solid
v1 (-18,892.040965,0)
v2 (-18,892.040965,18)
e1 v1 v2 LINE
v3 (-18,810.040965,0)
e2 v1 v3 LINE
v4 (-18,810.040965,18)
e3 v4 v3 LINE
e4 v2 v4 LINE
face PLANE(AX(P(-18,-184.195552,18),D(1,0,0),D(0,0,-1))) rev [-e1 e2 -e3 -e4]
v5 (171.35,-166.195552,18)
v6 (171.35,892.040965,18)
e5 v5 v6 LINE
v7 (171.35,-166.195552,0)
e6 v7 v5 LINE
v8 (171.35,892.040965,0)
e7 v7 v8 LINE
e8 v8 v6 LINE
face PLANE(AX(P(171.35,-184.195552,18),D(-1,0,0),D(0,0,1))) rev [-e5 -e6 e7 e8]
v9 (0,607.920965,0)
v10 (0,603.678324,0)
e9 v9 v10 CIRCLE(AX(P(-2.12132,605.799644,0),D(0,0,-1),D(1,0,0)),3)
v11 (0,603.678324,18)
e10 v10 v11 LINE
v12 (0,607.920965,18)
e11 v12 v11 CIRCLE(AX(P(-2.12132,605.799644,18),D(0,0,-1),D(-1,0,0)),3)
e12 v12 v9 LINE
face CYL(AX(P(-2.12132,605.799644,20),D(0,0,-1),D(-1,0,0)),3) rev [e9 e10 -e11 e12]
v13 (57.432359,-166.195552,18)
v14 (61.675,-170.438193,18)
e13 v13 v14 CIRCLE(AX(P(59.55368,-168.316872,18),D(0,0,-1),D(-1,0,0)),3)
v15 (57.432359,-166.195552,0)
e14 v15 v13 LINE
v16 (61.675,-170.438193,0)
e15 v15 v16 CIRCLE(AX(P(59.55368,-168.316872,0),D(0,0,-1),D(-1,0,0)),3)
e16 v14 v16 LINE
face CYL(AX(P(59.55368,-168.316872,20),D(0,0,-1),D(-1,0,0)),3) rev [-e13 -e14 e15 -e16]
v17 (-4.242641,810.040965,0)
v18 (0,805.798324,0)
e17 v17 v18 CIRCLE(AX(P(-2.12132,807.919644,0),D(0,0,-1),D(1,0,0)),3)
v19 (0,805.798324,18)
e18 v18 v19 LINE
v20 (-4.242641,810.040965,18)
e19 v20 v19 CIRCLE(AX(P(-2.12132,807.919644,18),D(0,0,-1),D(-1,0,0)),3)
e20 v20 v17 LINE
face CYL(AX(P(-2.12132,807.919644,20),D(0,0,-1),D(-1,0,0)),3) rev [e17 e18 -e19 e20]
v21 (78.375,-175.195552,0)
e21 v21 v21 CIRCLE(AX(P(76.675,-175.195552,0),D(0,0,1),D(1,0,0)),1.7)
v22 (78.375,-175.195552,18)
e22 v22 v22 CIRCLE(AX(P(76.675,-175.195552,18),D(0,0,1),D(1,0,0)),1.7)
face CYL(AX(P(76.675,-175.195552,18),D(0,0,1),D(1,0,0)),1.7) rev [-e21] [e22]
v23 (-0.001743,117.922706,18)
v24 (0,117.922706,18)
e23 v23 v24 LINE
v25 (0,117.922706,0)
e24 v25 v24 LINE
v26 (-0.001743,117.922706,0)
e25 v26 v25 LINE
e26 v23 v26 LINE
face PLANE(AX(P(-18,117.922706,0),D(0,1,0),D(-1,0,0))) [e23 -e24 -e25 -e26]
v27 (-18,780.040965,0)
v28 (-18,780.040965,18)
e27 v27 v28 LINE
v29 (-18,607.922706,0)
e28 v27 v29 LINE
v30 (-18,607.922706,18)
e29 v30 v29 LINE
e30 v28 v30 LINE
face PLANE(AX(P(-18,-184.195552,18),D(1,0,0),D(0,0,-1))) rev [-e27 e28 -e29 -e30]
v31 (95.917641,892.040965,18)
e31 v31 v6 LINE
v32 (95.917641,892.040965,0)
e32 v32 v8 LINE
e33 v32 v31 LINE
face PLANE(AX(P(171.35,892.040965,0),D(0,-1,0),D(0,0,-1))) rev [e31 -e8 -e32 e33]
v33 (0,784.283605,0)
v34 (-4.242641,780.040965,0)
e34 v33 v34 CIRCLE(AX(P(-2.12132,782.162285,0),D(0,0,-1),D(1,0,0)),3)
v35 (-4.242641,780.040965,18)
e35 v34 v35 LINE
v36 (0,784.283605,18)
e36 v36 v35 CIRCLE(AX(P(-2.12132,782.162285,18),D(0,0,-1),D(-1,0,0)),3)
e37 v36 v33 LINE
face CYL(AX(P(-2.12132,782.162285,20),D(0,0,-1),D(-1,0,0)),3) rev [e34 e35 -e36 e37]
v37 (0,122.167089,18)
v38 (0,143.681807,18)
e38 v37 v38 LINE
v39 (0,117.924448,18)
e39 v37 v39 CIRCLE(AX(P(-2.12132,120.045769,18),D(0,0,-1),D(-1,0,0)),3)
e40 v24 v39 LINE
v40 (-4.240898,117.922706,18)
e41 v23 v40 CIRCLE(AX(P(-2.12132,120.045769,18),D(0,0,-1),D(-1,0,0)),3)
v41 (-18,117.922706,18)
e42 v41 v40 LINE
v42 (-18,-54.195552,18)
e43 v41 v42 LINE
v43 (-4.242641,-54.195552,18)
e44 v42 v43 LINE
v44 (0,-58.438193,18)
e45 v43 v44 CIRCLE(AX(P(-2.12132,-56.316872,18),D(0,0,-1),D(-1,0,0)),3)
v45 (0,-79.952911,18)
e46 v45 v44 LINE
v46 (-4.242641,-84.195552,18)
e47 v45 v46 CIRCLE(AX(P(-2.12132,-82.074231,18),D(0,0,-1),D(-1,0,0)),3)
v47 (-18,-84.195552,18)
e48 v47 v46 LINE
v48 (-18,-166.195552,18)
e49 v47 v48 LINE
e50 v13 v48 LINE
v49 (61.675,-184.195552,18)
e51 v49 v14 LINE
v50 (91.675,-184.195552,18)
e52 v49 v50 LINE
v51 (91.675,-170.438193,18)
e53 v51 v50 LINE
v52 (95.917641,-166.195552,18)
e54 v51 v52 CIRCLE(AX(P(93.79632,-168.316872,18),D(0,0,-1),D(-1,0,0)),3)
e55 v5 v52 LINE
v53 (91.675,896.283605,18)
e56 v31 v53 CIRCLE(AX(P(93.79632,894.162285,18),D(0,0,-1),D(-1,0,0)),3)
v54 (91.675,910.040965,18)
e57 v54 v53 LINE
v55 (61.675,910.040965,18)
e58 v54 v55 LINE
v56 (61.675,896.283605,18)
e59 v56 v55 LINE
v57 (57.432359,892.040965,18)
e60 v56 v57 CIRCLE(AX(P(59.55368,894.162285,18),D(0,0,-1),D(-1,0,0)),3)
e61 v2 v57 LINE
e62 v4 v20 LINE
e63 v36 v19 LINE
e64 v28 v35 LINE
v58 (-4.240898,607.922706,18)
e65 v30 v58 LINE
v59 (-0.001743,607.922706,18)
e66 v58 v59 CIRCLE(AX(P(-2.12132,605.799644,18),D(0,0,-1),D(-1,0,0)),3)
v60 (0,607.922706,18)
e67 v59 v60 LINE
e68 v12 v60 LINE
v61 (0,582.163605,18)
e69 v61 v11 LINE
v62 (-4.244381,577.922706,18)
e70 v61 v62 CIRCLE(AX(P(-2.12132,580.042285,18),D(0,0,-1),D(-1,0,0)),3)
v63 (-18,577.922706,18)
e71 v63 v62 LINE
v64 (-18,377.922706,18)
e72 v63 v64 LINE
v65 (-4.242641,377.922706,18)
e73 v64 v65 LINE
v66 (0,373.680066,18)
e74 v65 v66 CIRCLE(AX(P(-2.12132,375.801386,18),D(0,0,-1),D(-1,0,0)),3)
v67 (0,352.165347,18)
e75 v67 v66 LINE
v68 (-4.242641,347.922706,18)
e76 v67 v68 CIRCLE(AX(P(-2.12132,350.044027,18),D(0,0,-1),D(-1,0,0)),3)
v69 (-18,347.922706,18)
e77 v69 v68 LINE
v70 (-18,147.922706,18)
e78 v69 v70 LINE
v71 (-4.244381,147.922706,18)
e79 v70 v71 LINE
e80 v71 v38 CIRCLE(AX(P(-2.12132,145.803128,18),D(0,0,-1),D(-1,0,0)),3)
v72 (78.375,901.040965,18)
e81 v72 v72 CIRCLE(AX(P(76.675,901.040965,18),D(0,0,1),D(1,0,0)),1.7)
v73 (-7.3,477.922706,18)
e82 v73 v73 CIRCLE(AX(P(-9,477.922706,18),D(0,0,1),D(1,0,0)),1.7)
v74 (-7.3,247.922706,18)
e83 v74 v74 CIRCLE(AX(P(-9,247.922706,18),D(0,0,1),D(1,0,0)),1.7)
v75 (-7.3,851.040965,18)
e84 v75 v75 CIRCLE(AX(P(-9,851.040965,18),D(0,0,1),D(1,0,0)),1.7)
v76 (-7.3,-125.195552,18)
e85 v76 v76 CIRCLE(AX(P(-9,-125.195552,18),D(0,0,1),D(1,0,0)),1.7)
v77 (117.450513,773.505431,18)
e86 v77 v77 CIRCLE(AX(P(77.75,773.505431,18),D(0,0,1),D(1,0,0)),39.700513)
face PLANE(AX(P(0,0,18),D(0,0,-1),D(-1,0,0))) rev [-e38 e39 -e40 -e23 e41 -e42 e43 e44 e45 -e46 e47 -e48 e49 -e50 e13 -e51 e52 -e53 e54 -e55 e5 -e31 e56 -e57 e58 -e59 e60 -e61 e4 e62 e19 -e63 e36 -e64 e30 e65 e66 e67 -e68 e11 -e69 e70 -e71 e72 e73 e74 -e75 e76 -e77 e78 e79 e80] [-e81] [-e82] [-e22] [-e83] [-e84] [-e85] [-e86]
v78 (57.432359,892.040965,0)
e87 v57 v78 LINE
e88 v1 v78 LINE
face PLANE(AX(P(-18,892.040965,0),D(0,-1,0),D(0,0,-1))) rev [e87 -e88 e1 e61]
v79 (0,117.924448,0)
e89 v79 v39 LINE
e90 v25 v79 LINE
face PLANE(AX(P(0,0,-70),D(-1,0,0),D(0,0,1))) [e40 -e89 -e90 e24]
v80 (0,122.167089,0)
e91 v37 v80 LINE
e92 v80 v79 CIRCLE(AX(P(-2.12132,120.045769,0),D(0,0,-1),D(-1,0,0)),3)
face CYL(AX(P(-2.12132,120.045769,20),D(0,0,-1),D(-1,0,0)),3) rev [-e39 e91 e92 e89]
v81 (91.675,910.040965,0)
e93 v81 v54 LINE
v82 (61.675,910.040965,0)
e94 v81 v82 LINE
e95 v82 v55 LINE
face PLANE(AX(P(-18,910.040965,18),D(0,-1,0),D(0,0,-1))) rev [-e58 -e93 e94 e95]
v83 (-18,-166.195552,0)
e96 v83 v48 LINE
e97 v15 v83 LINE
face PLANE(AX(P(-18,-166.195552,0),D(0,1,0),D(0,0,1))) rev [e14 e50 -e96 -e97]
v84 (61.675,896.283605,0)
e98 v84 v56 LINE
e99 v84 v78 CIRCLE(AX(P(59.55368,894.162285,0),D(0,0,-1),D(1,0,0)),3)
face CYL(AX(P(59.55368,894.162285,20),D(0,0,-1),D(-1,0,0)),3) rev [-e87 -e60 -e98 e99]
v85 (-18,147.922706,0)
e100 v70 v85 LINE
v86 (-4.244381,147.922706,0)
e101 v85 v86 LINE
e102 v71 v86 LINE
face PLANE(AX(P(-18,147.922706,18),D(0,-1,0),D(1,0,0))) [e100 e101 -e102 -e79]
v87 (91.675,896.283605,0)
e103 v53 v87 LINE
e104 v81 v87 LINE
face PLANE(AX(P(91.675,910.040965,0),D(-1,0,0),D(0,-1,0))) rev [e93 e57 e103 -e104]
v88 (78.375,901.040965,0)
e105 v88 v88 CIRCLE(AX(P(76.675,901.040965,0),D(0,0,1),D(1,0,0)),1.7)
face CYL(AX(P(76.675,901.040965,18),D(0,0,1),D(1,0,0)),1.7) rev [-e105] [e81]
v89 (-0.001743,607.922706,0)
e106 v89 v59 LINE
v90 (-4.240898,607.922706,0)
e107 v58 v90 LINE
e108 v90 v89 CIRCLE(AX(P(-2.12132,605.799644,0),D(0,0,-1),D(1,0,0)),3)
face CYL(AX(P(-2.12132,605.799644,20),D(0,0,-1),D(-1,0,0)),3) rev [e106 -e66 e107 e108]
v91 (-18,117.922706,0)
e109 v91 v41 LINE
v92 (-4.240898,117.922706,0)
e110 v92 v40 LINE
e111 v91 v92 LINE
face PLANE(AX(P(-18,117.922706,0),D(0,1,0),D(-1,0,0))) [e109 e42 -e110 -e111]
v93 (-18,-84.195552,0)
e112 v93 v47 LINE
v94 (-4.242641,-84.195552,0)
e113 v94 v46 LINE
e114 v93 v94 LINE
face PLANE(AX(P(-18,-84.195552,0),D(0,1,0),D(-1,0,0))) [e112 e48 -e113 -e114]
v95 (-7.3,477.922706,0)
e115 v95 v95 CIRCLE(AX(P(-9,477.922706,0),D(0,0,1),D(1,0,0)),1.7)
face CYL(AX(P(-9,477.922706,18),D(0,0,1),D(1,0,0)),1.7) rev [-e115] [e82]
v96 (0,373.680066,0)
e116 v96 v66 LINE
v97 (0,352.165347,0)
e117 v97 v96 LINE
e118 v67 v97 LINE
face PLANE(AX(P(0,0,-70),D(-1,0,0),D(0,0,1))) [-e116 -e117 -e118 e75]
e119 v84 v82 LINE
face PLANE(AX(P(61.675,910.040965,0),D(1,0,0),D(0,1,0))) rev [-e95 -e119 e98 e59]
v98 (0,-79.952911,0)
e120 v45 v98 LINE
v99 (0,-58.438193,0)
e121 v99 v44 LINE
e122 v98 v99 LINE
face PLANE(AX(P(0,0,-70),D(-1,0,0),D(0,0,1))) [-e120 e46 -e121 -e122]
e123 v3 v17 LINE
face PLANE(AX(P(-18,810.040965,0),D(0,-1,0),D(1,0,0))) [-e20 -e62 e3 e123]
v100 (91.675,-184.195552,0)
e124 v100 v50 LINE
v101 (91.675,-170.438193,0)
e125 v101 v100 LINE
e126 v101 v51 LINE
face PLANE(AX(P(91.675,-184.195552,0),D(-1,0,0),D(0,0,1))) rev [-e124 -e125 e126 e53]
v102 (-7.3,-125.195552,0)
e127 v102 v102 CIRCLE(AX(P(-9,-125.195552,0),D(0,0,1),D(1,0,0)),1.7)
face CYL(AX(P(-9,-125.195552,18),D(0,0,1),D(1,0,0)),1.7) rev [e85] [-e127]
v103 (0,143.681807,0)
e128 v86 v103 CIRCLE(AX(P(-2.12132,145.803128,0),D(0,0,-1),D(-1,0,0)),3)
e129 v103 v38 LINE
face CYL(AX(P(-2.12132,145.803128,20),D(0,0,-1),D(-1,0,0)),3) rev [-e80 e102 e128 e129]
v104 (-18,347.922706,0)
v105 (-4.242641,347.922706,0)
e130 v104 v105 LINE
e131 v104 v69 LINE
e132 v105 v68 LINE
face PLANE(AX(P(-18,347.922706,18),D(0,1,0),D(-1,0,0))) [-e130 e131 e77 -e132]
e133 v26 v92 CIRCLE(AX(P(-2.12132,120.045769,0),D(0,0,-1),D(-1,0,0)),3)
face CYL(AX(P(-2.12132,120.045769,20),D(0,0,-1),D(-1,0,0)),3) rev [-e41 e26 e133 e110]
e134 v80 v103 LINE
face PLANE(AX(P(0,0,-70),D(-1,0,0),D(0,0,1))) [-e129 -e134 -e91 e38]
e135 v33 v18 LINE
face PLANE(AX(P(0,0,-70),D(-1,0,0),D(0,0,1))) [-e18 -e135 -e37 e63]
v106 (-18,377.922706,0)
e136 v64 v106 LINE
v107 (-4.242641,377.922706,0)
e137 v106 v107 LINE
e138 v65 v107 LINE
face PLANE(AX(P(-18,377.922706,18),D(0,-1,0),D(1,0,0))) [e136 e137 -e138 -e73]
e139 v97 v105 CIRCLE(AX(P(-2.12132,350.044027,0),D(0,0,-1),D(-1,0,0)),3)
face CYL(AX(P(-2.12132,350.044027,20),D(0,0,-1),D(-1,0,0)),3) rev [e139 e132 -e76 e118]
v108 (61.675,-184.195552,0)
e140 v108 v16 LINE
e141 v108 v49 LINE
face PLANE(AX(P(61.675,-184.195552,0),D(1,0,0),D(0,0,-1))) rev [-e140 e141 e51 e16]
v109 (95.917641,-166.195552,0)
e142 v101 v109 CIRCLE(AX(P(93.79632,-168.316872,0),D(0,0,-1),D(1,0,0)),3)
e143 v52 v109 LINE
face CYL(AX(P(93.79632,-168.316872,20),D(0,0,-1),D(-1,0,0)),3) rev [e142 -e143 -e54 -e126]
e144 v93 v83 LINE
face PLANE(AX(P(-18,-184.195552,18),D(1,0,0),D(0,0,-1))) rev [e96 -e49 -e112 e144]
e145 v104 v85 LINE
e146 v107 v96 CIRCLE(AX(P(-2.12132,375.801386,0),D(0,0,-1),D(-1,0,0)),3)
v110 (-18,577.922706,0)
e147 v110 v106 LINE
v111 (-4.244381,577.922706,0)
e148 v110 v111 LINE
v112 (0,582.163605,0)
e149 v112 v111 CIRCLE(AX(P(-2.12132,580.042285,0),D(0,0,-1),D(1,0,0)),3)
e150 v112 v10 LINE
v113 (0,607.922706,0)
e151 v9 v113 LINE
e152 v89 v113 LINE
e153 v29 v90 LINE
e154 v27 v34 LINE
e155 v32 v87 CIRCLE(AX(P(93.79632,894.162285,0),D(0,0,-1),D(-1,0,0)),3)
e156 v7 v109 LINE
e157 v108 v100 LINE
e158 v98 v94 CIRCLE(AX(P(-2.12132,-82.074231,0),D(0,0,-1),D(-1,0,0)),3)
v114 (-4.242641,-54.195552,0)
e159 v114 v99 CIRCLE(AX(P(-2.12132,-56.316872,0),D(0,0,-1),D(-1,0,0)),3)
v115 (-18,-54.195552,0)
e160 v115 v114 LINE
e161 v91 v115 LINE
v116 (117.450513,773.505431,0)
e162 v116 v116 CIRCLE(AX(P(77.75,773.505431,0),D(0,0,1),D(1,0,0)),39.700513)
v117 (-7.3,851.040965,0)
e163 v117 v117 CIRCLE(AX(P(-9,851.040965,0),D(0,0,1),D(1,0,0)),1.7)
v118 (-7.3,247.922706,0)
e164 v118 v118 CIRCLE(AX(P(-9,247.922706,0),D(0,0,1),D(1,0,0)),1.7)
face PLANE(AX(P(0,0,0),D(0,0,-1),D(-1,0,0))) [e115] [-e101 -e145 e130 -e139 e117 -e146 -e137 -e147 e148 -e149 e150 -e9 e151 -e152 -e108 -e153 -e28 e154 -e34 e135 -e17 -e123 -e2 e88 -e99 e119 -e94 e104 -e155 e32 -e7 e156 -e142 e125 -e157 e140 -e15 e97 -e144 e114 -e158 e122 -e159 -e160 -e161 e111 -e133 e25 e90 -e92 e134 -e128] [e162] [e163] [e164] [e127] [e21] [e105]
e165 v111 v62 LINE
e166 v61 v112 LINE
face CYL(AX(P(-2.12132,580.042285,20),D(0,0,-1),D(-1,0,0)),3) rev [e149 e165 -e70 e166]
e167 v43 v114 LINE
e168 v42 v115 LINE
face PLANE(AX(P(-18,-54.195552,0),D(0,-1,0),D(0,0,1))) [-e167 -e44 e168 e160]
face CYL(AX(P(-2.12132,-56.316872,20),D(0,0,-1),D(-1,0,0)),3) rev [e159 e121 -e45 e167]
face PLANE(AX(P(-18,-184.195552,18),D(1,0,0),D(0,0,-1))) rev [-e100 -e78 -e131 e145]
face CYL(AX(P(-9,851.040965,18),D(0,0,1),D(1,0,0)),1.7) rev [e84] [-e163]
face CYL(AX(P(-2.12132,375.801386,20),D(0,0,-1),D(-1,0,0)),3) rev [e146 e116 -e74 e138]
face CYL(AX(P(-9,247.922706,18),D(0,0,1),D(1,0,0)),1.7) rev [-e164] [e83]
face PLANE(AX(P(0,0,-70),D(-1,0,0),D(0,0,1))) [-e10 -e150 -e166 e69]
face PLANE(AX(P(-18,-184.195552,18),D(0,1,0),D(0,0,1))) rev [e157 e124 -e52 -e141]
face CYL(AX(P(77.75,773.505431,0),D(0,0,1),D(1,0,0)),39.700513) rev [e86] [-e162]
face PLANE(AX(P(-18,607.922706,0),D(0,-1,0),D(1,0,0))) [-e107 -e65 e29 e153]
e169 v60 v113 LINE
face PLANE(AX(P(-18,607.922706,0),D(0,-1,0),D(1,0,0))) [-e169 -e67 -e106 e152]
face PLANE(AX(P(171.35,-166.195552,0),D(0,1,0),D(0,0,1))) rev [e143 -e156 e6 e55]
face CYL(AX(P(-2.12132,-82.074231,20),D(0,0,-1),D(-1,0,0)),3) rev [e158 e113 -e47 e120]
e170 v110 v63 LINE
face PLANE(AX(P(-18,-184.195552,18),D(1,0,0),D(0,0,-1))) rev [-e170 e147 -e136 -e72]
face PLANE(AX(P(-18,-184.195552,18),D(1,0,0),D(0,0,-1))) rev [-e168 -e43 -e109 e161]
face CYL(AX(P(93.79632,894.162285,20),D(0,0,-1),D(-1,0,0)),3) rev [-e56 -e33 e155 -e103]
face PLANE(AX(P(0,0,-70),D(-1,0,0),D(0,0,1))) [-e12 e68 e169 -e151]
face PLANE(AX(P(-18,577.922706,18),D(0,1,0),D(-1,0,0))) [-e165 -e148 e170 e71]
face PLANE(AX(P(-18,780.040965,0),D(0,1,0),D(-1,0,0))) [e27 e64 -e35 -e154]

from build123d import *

# Parameters (mm, degrees)
SKETCH1_W            = 189.35
SKETCH1_H            = 1094.236516537
BOSS_EXTRUDE1_DEPTH  = 18
CAVITY1_START        = -84.195551816
CAVITY1_OUTLINE_W    = 18
CAVITY1_OUTLINE_H    = 18
CAVITY1_DEPTH        = 30
CAVITY1_START_2      = 117.922706453
CAVITY1_2_OUTLINE_W  = 18
CAVITY1_2_OUTLINE_H  = 18
CAVITY1_2_DEPTH      = 30
CAVITY1_START_3      = 347.922706453
CAVITY1_3_OUTLINE_W  = 18
CAVITY1_3_OUTLINE_H  = 18
CAVITY1_3_DEPTH      = 30
CAVITY1_START_4      = 577.922706453
CAVITY1_4_OUTLINE_W  = 18
CAVITY1_4_OUTLINE_H  = 18
CAVITY1_4_DEPTH      = 30
CAVITY1_START_5      = 780.040964722
CAVITY1_5_OUTLINE_W  = 18
CAVITY1_5_OUTLINE_H  = 18
CAVITY1_5_DEPTH      = 30
SKETCH2_W            = 79.675
SKETCH2_H            = 18
CUT_EXTRUDE1_DEPTH   = 18
SKETCH3_R            = 39.700513166
CUT_EXTRUDE2_DEPTH   = 18
M3_CLEARANCE_HOLE1_D = 3.4
SKETCH7_R            = 3
CUT_EXTRUDE3_DEPTH   = 20


# Read off the part's stored shape, not the designer's step: Cavity1
with BuildPart() as part:
    # Sketch1 → Boss-Extrude1 (new body)
    with BuildSketch(Plane.XY):
        with Locations((76.675, 362.922706452)):
            Rectangle(SKETCH1_W, SKETCH1_H)
    extrude(amount=BOSS_EXTRUDE1_DEPTH)

    # Cavity1 outline → Cavity1 (cut)
    with BuildSketch(Plane(origin=(0, 0, 0), x_dir=(1, 0, 0), z_dir=(0, 1, 0)).offset(CAVITY1_START)):
        with Locations((-9, -9)):
            Rectangle(CAVITY1_OUTLINE_W, CAVITY1_OUTLINE_H)
    extrude(amount=CAVITY1_DEPTH, mode=Mode.SUBTRACT)

    # Cavity1 2 outline → Cavity1 2 (cut)
    with BuildSketch(Plane(origin=(0, 0, 0), x_dir=(1, 0, 0), z_dir=(0, 1, 0)).offset(CAVITY1_START_2)):
        with Locations((-9, -9)):
            Rectangle(CAVITY1_2_OUTLINE_W, CAVITY1_2_OUTLINE_H)
    extrude(amount=CAVITY1_2_DEPTH, mode=Mode.SUBTRACT)

    # Cavity1 3 outline → Cavity1 3 (cut)
    with BuildSketch(Plane(origin=(0, 0, 0), x_dir=(1, 0, 0), z_dir=(0, 1, 0)).offset(CAVITY1_START_3)):
        with Locations((-9, -9)):
            Rectangle(CAVITY1_3_OUTLINE_W, CAVITY1_3_OUTLINE_H)
    extrude(amount=CAVITY1_3_DEPTH, mode=Mode.SUBTRACT)

    # Cavity1 4 outline → Cavity1 4 (cut)
    with BuildSketch(Plane(origin=(0, 0, 0), x_dir=(1, 0, 0), z_dir=(0, 1, 0)).offset(CAVITY1_START_4)):
        with Locations((-9, -9)):
            Rectangle(CAVITY1_4_OUTLINE_W, CAVITY1_4_OUTLINE_H)
    extrude(amount=CAVITY1_4_DEPTH, mode=Mode.SUBTRACT)

    # Cavity1 5 outline → Cavity1 5 (cut)
    with BuildSketch(Plane(origin=(0, 0, 0), x_dir=(1, 0, 0), z_dir=(0, 1, 0)).offset(CAVITY1_START_5)):
        with Locations((-9, -9)):
            Rectangle(CAVITY1_5_OUTLINE_W, CAVITY1_5_OUTLINE_H)
    extrude(amount=CAVITY1_5_DEPTH, mode=Mode.SUBTRACT)

    # Sketch2 → Cut-Extrude1 (cut)
    with BuildSketch(Plane.XY.offset(18)):
        with Locations((21.8375, -175.195551816)):
            Rectangle(SKETCH2_W, SKETCH2_H)
        with Locations((131.5125, -175.195551816)):
            Rectangle(SKETCH2_W, SKETCH2_H)
        with Locations((21.8375, 901.040964721)):
            Rectangle(SKETCH2_W, SKETCH2_H)
        with Locations((131.5125, 901.040964721)):
            Rectangle(SKETCH2_W, SKETCH2_H)
    extrude(amount=-CUT_EXTRUDE1_DEPTH, mode=Mode.SUBTRACT)

    # Sketch3 → Cut-Extrude2 (cut)
    with BuildSketch(Plane.XY.offset(18)):
        with Locations((77.75, 773.505430817)):
            Circle(SKETCH3_R)
    extrude(amount=-CUT_EXTRUDE2_DEPTH, mode=Mode.SUBTRACT)

    # M3 Clearance Hole1 (through all)
    with Locations(Plane.XY.offset(18)):
        with Locations((-9, 851.040964721), (-9, -125.195551816), (-9, 477.922706453), (-9, 247.922706453), (76.675, 901.040964721), (76.675, -175.195551816)):
            Hole(M3_CLEARANCE_HOLE1_D / 2)

    # Sketch7 → Cut-Extrude3 (cut)
    with BuildSketch(Plane(origin=(0, 0, 0), x_dir=(-1, 0, 0), z_dir=(0, 0, -1))):
        with Locations((2.121320344, -56.31687216)):
            Circle(SKETCH7_R)
        with Locations((2.121320344, -82.074231473)):
            Circle(SKETCH7_R)
        with Locations((2.121320344, 145.80312784)):
            Circle(SKETCH7_R)
        with Locations((2.121320344, 120.045768527)):
            Circle(SKETCH7_R)
        with Locations((2.121320344, 605.799644378)):
            Circle(SKETCH7_R)
        with Locations((2.121320344, 580.042285065)):
            Circle(SKETCH7_R)
        with Locations((2.121320344, 807.919644378)):
            Circle(SKETCH7_R)
        with Locations((2.121320344, 782.162285065)):
            Circle(SKETCH7_R)
        with Locations((2.121320344, 375.801386109)):
            Circle(SKETCH7_R)
        with Locations((2.121320344, 350.044026796)):
            Circle(SKETCH7_R)
        with Locations((-59.553679656, -168.31687216)):
            Circle(SKETCH7_R)
        with Locations((-93.796320344, -168.31687216)):
            Circle(SKETCH7_R)
        with Locations((-93.796320344, 894.162285065)):
            Circle(SKETCH7_R)
        with Locations((-59.553679656, 894.162285065)):
            Circle(SKETCH7_R)
    extrude(amount=-CUT_EXTRUDE3_DEPTH, mode=Mode.SUBTRACT)


solid = part.part
